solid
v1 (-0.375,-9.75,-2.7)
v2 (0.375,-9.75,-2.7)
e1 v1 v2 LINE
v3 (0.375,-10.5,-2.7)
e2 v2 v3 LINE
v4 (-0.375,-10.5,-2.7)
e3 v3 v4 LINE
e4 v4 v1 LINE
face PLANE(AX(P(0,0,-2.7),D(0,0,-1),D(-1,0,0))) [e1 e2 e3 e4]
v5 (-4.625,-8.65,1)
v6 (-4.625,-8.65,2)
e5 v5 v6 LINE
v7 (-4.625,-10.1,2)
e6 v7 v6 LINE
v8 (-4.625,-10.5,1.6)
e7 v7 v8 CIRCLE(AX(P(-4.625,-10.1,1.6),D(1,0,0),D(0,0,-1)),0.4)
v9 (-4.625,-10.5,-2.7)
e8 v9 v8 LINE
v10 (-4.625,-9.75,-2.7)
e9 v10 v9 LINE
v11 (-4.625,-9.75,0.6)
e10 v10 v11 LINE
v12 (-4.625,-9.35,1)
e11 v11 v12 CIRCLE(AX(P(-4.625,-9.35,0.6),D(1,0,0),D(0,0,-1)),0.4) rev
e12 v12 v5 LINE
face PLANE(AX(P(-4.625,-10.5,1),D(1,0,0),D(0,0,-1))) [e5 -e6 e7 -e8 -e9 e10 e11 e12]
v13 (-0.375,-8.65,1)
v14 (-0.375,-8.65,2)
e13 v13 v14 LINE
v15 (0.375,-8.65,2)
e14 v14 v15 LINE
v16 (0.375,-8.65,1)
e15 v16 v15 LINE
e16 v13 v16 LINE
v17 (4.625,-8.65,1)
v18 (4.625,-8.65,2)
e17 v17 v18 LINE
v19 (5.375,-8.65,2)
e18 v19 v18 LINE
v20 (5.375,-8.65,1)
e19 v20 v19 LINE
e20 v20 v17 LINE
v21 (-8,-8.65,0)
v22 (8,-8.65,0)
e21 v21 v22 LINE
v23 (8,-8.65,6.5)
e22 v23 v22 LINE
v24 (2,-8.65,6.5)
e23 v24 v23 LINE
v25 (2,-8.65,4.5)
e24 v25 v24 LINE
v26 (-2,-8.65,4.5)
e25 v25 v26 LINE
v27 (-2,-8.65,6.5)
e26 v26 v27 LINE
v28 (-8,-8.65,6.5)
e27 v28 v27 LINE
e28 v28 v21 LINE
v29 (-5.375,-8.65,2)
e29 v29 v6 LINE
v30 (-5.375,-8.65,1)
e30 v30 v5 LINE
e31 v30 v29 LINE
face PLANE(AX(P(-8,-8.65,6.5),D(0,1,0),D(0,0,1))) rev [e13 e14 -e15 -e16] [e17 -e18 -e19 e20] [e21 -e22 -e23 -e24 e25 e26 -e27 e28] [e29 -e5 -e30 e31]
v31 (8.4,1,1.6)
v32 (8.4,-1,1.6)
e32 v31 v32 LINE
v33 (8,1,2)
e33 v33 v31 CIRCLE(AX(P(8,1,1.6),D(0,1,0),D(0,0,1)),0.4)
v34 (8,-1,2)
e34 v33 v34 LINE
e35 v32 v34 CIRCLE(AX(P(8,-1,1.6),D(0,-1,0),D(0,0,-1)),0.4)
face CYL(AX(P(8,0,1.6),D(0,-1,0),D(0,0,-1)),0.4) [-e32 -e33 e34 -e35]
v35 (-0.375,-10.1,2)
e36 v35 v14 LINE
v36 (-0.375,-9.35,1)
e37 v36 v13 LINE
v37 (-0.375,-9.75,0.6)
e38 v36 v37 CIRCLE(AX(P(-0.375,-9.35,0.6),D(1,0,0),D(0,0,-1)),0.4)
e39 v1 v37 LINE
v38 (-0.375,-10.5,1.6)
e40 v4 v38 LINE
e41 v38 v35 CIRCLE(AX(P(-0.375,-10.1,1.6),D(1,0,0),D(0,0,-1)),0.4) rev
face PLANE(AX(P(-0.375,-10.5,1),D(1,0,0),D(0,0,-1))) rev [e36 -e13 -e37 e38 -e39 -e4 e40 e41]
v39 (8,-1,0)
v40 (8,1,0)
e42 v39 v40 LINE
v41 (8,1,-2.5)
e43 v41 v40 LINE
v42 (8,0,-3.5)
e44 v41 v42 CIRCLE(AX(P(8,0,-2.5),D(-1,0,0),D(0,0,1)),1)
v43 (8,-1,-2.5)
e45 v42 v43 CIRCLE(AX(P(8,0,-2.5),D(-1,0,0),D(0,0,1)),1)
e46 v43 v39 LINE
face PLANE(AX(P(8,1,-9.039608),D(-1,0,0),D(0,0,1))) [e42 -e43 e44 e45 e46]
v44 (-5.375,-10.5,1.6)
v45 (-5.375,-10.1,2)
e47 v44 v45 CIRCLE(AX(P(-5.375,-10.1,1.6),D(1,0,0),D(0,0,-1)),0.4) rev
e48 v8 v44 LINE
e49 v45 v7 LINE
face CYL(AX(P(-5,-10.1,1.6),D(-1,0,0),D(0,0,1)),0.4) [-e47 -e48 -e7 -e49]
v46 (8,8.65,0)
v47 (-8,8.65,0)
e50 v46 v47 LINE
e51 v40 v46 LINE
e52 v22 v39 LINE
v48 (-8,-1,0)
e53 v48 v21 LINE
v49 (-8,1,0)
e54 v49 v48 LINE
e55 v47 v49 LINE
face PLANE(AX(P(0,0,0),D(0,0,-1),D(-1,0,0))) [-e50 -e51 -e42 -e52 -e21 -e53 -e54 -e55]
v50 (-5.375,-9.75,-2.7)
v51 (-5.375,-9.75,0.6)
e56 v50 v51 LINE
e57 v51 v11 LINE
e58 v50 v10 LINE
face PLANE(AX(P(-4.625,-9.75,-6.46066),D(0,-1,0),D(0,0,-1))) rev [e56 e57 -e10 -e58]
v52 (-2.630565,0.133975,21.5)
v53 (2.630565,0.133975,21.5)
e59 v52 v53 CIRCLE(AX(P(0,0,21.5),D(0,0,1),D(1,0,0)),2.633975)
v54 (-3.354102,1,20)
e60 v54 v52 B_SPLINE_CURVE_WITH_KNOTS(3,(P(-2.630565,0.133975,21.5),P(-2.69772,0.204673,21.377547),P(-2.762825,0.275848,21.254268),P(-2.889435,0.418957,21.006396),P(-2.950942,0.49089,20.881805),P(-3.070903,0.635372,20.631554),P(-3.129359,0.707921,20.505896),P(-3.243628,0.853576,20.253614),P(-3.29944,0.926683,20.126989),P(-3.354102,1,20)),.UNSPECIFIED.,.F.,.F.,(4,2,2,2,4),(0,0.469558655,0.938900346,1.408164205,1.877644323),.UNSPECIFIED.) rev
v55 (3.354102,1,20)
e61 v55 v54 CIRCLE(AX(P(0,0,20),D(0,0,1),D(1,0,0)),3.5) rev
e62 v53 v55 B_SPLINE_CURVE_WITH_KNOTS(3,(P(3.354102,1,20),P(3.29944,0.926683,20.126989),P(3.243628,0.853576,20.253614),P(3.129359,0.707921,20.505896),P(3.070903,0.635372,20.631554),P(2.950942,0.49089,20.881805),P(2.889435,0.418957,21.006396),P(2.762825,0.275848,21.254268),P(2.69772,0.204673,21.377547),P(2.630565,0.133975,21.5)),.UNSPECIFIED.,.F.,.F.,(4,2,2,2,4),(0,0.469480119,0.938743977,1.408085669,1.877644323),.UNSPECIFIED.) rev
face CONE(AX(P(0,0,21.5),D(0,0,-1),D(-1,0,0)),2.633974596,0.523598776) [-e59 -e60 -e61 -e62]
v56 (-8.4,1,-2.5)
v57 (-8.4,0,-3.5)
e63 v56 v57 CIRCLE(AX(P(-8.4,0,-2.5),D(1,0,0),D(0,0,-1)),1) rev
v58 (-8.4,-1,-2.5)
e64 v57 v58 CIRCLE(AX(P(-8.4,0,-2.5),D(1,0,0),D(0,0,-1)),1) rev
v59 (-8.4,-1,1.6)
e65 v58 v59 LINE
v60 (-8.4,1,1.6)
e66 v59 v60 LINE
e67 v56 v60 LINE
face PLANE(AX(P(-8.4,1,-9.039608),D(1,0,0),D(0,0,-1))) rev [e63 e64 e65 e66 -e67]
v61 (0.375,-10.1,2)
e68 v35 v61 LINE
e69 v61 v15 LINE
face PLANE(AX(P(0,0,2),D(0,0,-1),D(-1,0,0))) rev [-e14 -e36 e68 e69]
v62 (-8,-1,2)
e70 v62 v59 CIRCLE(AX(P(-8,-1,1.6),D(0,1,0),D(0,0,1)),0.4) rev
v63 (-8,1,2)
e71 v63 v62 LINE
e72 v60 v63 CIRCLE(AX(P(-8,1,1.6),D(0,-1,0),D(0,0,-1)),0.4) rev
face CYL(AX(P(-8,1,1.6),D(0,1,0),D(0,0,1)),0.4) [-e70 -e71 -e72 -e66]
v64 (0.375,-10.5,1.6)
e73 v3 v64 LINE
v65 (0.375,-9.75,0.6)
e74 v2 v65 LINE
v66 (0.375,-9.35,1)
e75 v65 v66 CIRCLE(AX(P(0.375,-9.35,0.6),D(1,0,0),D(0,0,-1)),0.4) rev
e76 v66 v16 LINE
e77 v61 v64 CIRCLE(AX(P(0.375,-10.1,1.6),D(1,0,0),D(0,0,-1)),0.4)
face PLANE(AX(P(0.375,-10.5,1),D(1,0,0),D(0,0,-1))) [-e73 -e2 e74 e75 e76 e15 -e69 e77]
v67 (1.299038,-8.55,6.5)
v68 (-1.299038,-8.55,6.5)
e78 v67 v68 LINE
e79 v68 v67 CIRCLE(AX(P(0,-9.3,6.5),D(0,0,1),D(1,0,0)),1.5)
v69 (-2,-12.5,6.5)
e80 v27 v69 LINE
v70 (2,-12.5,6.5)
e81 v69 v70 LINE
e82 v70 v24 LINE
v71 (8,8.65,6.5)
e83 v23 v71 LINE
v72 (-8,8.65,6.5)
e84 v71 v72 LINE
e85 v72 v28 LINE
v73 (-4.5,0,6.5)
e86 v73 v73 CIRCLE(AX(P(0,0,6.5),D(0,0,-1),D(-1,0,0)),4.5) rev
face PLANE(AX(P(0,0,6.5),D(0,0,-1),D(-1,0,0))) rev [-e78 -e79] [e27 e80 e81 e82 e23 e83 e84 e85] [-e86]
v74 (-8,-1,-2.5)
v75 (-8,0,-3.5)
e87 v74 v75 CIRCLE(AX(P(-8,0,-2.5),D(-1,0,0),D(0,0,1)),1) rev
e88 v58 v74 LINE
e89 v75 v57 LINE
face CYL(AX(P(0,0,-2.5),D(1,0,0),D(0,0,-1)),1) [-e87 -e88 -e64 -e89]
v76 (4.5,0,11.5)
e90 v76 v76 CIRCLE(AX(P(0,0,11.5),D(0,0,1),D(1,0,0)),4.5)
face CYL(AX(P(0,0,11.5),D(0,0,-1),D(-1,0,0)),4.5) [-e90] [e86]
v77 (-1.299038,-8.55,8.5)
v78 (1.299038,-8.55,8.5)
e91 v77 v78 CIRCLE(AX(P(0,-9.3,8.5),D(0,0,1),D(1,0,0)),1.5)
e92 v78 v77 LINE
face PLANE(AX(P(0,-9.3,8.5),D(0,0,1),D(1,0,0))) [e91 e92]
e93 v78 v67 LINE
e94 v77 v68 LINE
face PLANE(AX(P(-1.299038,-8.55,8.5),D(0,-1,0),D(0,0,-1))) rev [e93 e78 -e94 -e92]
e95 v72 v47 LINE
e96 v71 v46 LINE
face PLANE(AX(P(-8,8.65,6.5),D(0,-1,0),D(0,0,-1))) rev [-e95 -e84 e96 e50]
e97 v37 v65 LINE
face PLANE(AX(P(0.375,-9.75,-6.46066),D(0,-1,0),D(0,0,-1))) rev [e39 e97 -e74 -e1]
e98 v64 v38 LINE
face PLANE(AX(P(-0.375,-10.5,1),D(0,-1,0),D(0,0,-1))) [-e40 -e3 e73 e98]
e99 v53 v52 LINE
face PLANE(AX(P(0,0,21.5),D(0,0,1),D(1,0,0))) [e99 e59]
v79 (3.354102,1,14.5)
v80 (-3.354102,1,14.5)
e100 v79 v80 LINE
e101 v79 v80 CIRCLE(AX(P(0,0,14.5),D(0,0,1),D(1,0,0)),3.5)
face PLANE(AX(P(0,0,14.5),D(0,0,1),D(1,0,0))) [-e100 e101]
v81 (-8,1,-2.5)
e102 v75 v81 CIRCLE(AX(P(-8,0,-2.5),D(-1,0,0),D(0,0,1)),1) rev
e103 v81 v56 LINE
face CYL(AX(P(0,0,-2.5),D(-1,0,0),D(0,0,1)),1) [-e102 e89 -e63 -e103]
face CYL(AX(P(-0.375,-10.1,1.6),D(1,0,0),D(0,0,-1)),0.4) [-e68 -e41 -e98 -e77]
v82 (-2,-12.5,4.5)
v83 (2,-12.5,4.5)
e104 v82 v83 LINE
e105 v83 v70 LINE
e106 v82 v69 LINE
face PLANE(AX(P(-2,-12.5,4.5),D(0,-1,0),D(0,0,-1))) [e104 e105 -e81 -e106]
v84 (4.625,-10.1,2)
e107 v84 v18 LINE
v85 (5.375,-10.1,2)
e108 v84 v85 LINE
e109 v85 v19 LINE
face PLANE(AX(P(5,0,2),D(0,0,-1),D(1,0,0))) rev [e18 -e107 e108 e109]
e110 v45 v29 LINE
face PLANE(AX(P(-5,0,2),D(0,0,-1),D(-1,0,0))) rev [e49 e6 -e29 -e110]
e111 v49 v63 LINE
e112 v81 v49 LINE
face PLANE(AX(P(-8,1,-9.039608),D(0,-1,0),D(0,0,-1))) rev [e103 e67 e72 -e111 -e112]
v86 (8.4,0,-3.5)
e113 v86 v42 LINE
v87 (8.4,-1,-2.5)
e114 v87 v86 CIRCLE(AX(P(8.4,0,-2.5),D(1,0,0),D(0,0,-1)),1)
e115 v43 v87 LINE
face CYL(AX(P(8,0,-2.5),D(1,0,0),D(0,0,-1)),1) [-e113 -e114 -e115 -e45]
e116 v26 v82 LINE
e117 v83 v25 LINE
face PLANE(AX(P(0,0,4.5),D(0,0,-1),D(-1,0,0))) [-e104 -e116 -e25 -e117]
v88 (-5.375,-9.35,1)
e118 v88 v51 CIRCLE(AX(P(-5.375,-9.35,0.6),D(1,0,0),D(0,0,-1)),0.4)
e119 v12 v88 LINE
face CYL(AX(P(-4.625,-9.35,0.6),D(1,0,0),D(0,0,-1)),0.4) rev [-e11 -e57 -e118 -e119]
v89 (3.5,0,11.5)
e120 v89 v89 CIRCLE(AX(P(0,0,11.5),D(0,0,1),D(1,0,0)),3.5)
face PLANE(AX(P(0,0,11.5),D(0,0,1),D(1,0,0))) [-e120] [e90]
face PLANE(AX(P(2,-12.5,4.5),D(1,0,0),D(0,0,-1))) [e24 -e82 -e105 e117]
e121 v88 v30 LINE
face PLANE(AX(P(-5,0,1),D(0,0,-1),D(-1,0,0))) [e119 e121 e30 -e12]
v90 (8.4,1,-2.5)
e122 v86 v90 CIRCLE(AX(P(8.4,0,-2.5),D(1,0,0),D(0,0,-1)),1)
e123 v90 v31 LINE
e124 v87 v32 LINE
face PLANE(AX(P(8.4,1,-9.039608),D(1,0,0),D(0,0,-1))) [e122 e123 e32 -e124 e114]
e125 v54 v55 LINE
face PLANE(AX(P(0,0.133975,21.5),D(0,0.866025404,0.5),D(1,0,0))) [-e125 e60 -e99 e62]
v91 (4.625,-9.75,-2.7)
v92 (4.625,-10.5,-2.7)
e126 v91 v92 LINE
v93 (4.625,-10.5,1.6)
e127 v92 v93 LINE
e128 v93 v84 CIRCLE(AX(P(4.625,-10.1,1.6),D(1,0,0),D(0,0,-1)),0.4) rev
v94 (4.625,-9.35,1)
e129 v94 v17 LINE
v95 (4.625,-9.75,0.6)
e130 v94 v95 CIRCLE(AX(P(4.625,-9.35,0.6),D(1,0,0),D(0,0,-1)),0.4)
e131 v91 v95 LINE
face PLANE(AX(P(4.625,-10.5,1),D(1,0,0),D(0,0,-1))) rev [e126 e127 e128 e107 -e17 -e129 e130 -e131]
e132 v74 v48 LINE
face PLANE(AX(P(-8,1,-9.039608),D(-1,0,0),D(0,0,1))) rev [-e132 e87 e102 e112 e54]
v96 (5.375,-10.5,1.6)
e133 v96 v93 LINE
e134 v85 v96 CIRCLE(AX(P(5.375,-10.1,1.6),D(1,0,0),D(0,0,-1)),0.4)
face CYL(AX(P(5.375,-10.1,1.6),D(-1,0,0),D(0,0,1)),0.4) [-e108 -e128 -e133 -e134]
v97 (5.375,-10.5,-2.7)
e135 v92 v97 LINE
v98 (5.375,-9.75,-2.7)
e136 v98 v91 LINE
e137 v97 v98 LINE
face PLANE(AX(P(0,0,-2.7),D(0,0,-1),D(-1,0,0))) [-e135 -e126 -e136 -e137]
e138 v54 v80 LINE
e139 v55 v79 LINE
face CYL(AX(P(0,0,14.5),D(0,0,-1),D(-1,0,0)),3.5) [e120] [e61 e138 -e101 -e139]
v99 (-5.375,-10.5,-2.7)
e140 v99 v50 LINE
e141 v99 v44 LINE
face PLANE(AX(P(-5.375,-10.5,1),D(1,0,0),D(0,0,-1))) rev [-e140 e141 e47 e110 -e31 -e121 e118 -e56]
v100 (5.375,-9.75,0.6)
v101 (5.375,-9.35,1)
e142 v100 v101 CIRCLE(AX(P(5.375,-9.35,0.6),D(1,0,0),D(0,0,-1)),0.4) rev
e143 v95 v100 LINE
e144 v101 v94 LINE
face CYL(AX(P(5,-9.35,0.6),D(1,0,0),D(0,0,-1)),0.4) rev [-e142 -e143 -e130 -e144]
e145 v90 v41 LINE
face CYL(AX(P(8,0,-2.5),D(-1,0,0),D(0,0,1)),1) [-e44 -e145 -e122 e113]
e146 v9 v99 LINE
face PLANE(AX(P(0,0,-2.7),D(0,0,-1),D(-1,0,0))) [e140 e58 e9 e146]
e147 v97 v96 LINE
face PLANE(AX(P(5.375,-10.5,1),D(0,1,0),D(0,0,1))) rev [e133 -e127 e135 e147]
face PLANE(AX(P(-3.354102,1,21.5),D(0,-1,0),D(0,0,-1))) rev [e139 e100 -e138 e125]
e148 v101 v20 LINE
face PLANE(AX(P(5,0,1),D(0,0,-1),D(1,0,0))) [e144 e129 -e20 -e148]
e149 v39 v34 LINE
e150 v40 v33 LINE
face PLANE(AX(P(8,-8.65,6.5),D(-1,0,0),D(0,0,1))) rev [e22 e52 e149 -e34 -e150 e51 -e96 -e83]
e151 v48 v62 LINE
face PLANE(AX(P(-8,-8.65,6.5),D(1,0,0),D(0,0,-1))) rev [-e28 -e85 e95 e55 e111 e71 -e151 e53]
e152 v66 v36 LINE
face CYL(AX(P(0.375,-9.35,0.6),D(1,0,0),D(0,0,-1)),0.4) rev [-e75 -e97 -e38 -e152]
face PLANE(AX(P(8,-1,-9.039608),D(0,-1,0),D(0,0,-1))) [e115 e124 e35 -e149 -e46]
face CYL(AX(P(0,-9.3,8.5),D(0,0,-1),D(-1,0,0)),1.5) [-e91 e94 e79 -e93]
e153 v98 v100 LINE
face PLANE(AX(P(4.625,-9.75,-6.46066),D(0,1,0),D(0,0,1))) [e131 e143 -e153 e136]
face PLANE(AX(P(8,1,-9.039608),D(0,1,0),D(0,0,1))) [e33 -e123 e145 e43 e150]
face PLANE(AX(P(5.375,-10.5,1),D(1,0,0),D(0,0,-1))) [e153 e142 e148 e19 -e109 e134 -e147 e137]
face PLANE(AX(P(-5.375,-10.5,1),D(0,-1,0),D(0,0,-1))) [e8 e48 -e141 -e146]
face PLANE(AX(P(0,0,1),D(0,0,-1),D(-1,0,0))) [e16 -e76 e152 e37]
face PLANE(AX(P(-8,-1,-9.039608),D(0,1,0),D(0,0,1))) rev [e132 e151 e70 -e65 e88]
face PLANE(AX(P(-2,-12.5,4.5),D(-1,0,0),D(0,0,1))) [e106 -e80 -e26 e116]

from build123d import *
from OCP.BRepFilletAPI import BRepFilletAPI_MakeChamfer

# Parameters (mm, degrees)
SKETCH1_W              = 16
SKETCH1_H              = 17.3
BOSS_EXTRUDE1_DEPTH    = 6.5
SKETCH2_W              = 4
SKETCH2_H              = 3.85
BOSS_EXTRUDE2_DEPTH    = 2
BOSS_EXTRUDE3_DEPTH    = 2
SKETCH4_R              = 4.5
BOSS_EXTRUDE4_DEPTH    = 5
SKETCH5_R              = 3.5
BOSS_EXTRUDE5_DEPTH    = 3
BOSS_EXTRUDE6_DEPTH    = 7
CHAMFER1_SIZE          = 1.5
CHAMFER1_SIZE2         = 0.866025404
SKETCH7_W              = 0.75
SKETCH7_H              = 1.85
BOSS_EXTRUDE7_DEPTH    = 1
SKETCH8_W              = 0.75
SKETCH8_H              = 0.75
BOSS_EXTRUDE8_DEPTH    = 3.7
FILLET1_R              = 0.4
LPATTERN1_COUNT        = 2
LPATTERN1_PITCH        = 5
FILLET1_OF_LPATTERN1_R = 0.4
MIRROR1_START          = 4.625
MIRROR1_DEPTH          = 0.75
SKETCH10_W             = 0.4
SKETCH10_H             = 2
BOSS_EXTRUDE9_DEPTH    = 5.5
FILLET2_R              = 0.4
FILLET3_R              = 1
FILLET2_OF_MIRROR2_R   = 0.4
FILLET3_OF_MIRROR2_R   = 1


# Read off the part's stored shape, not the designer's step: Mirror1
with BuildPart() as part:
    # Sketch1 → Boss-Extrude1 (new body)
    with BuildSketch(Plane.XY):
        Rectangle(SKETCH1_W, SKETCH1_H)
    extrude(amount=BOSS_EXTRUDE1_DEPTH)

    # Sketch2 → Boss-Extrude2 (add)
    with BuildSketch(Plane.XY.offset(6.5)):
        with Locations((0, -10.575)):
            Rectangle(SKETCH2_W, SKETCH2_H)
    extrude(amount=-BOSS_EXTRUDE2_DEPTH)

    # Sketch3 → Boss-Extrude3 (add)
    with BuildSketch(Plane.XY.offset(6.5)):
        with BuildLine():
            Line((-1.299038106, -8.55), (1.299038106, -8.55))
            ThreePointArc((1.299038106, -8.55), (0, -10.8), (-1.299038106, -8.55))
        make_face()
    extrude(amount=BOSS_EXTRUDE3_DEPTH)

    # Sketch4 → Boss-Extrude4 (add)
    with BuildSketch(Plane.XY.offset(6.5)):
        with Locations(Location((0, 0, 0), (0, 0, 180))):
            Circle(SKETCH4_R)
    extrude(amount=BOSS_EXTRUDE4_DEPTH)

    # Sketch5 → Boss-Extrude5 (add)
    with BuildSketch(Plane.XY.offset(11.5)):
        Circle(SKETCH5_R)
    extrude(amount=BOSS_EXTRUDE5_DEPTH)

    # Sketch6 → Boss-Extrude6 (add)
    with BuildSketch(Plane.XY.offset(14.5)):
        with BuildLine():
            Line((-3.354101966, 1), (3.354101966, 1))
            ThreePointArc((3.354101966, 1), (0, -3.5), (-3.354101966, 1))
        make_face()
    extrude(amount=BOSS_EXTRUDE6_DEPTH)

    # Chamfer1: one chamfer whose edges measure the first distance from different faces: ONE call of the kernel's chamfer builder (chamfer() names one face for all edges)
    chamfer1_edges_1 = [part.edges().sort_by_distance(p)[0] for p in [
        (0, -3.5, 21.5),
    ]]
    chamfer1_side_1 = [part.faces().sort_by_distance(p)[0] for p in [
        (0, -3.5, 18),
    ]]
    chamfer1_edges_2 = [part.edges().sort_by_distance(p)[0] for p in [
        (0, 1, 21.5),
    ]]
    chamfer1_side_2 = [part.faces().sort_by_distance(p)[0] for p in [
        (0, 1, 18),
    ]]
    chamfer1 = BRepFilletAPI_MakeChamfer(part.part.solid().wrapped)
    for e in chamfer1_edges_1:
        chamfer1.Add(CHAMFER1_SIZE, CHAMFER1_SIZE2, e.wrapped, chamfer1_side_1[0].wrapped)  # the first distance lies on this face
    for e in chamfer1_edges_2:
        chamfer1.Add(CHAMFER1_SIZE, CHAMFER1_SIZE2, e.wrapped, chamfer1_side_2[0].wrapped)  # the first distance lies on this face
    add(Compound.cast(chamfer1.Shape()), mode=Mode.REPLACE)

    # Sketch7 → Boss-Extrude7 (add)
    with BuildSketch(Plane(origin=(0, 0, 2), x_dir=(-1, 0, 0), z_dir=(0, 0, -1))):
        with Locations((0, -9.575)):
            Rectangle(SKETCH7_W, SKETCH7_H)
    boss_extrude7 = extrude(amount=BOSS_EXTRUDE7_DEPTH)

    # Sketch8 → Boss-Extrude8 (add)
    with BuildSketch(Plane(origin=(0, 0, 1), x_dir=(-1, 0, 0), z_dir=(0, 0, -1))):
        with Locations((0, -10.125)):
            Rectangle(SKETCH8_W, SKETCH8_H)
    boss_extrude8 = extrude(amount=BOSS_EXTRUDE8_DEPTH)

    # Fillet1
    fillet1_edges = [part.edges().sort_by_distance(p)[0] for p in [
        (0, -10.5, 2),
        (0, -9.75, 1),
    ]]
    fillet(fillet1_edges, radius=FILLET1_R)

    # LPattern1: Boss-Extrude7, Boss-Extrude8 ×2
    with Locations(*[(-i * LPATTERN1_PITCH, 0, 0) for i in range(1, LPATTERN1_COUNT)]):
        add(boss_extrude7)
        add(boss_extrude8)

    # Fillet1 of LPattern1
    fillet1_of_lpattern1_edges = [part.edges().sort_by_distance(p)[0] for p in [
        (-5, -10.5, 2),
        (-5, -9.75, 1),
    ]]
    fillet(fillet1_of_lpattern1_edges, radius=FILLET1_OF_LPATTERN1_R)

    # Mirror1 outline → Mirror1 (add)
    with BuildSketch(Plane.YZ.offset(MIRROR1_START)):
        with BuildLine():
            ThreePointArc((-9.75, 0.6), (-9.632842712, 0.882842712), (-9.35, 1))
            Line((-9.35, 1), (-8.65, 1))
            Line((-8.65, 1), (-8.65, 2))
            Line((-8.65, 2), (-10.1, 2))
            ThreePointArc((-10.1, 2), (-10.382842712, 1.882842712), (-10.5, 1.6))
            Line((-10.5, 1.6), (-10.5, -2.7))
            Line((-10.5, -2.7), (-9.75, -2.7))
            Line((-9.75, -2.7), (-9.75, 0.6))
        make_face()
    extrude(amount=MIRROR1_DEPTH)

    # Sketch10 → Boss-Extrude9 (add)
    with BuildSketch(Plane(origin=(0, 0, 2), x_dir=(-1, 0, 0), z_dir=(0, 0, -1))):
        with Locations((8.2, 0)):
            Rectangle(SKETCH10_W, SKETCH10_H)
    boss_extrude9 = extrude(amount=BOSS_EXTRUDE9_DEPTH)

    # Fillet2
    fillet2_edges = [part.edges().sort_by_distance(p)[0] for p in [
        (-8.4, 0, 2),
    ]]
    fillet(fillet2_edges, radius=FILLET2_R - 0.0001)  # a hair under: the kernel refuses the full size

    # Fillet3
    fillet3_edges = [part.edges().sort_by_distance(p)[0] for p in [
        (-8.2, 1, -3.5),
        (-8.2, -1, -3.5),
    ]]
    fillet(fillet3_edges, radius=FILLET3_R - 0.0001)  # a hair under: the kernel refuses the full size

    # Mirror2: Boss-Extrude9 across plane
    add(boss_extrude9.mirror(Plane.ZY))

    # Fillet2 of Mirror2
    fillet2_of_mirror2_edges = [part.edges().sort_by_distance(p)[0] for p in [
        (8.4, 0, 2),
    ]]
    fillet(fillet2_of_mirror2_edges, radius=FILLET2_OF_MIRROR2_R - 0.0001)  # a hair under: the kernel refuses the full size

    # Fillet3 of Mirror2
    fillet3_of_mirror2_edges = [part.edges().sort_by_distance(p)[0] for p in [
        (8.2, 1, -3.5),
        (8.2, -1, -3.5),
    ]]
    fillet(fillet3_of_mirror2_edges, radius=FILLET3_OF_MIRROR2_R - 0.0001)  # a hair under: the kernel refuses the full size


solid = part.part
